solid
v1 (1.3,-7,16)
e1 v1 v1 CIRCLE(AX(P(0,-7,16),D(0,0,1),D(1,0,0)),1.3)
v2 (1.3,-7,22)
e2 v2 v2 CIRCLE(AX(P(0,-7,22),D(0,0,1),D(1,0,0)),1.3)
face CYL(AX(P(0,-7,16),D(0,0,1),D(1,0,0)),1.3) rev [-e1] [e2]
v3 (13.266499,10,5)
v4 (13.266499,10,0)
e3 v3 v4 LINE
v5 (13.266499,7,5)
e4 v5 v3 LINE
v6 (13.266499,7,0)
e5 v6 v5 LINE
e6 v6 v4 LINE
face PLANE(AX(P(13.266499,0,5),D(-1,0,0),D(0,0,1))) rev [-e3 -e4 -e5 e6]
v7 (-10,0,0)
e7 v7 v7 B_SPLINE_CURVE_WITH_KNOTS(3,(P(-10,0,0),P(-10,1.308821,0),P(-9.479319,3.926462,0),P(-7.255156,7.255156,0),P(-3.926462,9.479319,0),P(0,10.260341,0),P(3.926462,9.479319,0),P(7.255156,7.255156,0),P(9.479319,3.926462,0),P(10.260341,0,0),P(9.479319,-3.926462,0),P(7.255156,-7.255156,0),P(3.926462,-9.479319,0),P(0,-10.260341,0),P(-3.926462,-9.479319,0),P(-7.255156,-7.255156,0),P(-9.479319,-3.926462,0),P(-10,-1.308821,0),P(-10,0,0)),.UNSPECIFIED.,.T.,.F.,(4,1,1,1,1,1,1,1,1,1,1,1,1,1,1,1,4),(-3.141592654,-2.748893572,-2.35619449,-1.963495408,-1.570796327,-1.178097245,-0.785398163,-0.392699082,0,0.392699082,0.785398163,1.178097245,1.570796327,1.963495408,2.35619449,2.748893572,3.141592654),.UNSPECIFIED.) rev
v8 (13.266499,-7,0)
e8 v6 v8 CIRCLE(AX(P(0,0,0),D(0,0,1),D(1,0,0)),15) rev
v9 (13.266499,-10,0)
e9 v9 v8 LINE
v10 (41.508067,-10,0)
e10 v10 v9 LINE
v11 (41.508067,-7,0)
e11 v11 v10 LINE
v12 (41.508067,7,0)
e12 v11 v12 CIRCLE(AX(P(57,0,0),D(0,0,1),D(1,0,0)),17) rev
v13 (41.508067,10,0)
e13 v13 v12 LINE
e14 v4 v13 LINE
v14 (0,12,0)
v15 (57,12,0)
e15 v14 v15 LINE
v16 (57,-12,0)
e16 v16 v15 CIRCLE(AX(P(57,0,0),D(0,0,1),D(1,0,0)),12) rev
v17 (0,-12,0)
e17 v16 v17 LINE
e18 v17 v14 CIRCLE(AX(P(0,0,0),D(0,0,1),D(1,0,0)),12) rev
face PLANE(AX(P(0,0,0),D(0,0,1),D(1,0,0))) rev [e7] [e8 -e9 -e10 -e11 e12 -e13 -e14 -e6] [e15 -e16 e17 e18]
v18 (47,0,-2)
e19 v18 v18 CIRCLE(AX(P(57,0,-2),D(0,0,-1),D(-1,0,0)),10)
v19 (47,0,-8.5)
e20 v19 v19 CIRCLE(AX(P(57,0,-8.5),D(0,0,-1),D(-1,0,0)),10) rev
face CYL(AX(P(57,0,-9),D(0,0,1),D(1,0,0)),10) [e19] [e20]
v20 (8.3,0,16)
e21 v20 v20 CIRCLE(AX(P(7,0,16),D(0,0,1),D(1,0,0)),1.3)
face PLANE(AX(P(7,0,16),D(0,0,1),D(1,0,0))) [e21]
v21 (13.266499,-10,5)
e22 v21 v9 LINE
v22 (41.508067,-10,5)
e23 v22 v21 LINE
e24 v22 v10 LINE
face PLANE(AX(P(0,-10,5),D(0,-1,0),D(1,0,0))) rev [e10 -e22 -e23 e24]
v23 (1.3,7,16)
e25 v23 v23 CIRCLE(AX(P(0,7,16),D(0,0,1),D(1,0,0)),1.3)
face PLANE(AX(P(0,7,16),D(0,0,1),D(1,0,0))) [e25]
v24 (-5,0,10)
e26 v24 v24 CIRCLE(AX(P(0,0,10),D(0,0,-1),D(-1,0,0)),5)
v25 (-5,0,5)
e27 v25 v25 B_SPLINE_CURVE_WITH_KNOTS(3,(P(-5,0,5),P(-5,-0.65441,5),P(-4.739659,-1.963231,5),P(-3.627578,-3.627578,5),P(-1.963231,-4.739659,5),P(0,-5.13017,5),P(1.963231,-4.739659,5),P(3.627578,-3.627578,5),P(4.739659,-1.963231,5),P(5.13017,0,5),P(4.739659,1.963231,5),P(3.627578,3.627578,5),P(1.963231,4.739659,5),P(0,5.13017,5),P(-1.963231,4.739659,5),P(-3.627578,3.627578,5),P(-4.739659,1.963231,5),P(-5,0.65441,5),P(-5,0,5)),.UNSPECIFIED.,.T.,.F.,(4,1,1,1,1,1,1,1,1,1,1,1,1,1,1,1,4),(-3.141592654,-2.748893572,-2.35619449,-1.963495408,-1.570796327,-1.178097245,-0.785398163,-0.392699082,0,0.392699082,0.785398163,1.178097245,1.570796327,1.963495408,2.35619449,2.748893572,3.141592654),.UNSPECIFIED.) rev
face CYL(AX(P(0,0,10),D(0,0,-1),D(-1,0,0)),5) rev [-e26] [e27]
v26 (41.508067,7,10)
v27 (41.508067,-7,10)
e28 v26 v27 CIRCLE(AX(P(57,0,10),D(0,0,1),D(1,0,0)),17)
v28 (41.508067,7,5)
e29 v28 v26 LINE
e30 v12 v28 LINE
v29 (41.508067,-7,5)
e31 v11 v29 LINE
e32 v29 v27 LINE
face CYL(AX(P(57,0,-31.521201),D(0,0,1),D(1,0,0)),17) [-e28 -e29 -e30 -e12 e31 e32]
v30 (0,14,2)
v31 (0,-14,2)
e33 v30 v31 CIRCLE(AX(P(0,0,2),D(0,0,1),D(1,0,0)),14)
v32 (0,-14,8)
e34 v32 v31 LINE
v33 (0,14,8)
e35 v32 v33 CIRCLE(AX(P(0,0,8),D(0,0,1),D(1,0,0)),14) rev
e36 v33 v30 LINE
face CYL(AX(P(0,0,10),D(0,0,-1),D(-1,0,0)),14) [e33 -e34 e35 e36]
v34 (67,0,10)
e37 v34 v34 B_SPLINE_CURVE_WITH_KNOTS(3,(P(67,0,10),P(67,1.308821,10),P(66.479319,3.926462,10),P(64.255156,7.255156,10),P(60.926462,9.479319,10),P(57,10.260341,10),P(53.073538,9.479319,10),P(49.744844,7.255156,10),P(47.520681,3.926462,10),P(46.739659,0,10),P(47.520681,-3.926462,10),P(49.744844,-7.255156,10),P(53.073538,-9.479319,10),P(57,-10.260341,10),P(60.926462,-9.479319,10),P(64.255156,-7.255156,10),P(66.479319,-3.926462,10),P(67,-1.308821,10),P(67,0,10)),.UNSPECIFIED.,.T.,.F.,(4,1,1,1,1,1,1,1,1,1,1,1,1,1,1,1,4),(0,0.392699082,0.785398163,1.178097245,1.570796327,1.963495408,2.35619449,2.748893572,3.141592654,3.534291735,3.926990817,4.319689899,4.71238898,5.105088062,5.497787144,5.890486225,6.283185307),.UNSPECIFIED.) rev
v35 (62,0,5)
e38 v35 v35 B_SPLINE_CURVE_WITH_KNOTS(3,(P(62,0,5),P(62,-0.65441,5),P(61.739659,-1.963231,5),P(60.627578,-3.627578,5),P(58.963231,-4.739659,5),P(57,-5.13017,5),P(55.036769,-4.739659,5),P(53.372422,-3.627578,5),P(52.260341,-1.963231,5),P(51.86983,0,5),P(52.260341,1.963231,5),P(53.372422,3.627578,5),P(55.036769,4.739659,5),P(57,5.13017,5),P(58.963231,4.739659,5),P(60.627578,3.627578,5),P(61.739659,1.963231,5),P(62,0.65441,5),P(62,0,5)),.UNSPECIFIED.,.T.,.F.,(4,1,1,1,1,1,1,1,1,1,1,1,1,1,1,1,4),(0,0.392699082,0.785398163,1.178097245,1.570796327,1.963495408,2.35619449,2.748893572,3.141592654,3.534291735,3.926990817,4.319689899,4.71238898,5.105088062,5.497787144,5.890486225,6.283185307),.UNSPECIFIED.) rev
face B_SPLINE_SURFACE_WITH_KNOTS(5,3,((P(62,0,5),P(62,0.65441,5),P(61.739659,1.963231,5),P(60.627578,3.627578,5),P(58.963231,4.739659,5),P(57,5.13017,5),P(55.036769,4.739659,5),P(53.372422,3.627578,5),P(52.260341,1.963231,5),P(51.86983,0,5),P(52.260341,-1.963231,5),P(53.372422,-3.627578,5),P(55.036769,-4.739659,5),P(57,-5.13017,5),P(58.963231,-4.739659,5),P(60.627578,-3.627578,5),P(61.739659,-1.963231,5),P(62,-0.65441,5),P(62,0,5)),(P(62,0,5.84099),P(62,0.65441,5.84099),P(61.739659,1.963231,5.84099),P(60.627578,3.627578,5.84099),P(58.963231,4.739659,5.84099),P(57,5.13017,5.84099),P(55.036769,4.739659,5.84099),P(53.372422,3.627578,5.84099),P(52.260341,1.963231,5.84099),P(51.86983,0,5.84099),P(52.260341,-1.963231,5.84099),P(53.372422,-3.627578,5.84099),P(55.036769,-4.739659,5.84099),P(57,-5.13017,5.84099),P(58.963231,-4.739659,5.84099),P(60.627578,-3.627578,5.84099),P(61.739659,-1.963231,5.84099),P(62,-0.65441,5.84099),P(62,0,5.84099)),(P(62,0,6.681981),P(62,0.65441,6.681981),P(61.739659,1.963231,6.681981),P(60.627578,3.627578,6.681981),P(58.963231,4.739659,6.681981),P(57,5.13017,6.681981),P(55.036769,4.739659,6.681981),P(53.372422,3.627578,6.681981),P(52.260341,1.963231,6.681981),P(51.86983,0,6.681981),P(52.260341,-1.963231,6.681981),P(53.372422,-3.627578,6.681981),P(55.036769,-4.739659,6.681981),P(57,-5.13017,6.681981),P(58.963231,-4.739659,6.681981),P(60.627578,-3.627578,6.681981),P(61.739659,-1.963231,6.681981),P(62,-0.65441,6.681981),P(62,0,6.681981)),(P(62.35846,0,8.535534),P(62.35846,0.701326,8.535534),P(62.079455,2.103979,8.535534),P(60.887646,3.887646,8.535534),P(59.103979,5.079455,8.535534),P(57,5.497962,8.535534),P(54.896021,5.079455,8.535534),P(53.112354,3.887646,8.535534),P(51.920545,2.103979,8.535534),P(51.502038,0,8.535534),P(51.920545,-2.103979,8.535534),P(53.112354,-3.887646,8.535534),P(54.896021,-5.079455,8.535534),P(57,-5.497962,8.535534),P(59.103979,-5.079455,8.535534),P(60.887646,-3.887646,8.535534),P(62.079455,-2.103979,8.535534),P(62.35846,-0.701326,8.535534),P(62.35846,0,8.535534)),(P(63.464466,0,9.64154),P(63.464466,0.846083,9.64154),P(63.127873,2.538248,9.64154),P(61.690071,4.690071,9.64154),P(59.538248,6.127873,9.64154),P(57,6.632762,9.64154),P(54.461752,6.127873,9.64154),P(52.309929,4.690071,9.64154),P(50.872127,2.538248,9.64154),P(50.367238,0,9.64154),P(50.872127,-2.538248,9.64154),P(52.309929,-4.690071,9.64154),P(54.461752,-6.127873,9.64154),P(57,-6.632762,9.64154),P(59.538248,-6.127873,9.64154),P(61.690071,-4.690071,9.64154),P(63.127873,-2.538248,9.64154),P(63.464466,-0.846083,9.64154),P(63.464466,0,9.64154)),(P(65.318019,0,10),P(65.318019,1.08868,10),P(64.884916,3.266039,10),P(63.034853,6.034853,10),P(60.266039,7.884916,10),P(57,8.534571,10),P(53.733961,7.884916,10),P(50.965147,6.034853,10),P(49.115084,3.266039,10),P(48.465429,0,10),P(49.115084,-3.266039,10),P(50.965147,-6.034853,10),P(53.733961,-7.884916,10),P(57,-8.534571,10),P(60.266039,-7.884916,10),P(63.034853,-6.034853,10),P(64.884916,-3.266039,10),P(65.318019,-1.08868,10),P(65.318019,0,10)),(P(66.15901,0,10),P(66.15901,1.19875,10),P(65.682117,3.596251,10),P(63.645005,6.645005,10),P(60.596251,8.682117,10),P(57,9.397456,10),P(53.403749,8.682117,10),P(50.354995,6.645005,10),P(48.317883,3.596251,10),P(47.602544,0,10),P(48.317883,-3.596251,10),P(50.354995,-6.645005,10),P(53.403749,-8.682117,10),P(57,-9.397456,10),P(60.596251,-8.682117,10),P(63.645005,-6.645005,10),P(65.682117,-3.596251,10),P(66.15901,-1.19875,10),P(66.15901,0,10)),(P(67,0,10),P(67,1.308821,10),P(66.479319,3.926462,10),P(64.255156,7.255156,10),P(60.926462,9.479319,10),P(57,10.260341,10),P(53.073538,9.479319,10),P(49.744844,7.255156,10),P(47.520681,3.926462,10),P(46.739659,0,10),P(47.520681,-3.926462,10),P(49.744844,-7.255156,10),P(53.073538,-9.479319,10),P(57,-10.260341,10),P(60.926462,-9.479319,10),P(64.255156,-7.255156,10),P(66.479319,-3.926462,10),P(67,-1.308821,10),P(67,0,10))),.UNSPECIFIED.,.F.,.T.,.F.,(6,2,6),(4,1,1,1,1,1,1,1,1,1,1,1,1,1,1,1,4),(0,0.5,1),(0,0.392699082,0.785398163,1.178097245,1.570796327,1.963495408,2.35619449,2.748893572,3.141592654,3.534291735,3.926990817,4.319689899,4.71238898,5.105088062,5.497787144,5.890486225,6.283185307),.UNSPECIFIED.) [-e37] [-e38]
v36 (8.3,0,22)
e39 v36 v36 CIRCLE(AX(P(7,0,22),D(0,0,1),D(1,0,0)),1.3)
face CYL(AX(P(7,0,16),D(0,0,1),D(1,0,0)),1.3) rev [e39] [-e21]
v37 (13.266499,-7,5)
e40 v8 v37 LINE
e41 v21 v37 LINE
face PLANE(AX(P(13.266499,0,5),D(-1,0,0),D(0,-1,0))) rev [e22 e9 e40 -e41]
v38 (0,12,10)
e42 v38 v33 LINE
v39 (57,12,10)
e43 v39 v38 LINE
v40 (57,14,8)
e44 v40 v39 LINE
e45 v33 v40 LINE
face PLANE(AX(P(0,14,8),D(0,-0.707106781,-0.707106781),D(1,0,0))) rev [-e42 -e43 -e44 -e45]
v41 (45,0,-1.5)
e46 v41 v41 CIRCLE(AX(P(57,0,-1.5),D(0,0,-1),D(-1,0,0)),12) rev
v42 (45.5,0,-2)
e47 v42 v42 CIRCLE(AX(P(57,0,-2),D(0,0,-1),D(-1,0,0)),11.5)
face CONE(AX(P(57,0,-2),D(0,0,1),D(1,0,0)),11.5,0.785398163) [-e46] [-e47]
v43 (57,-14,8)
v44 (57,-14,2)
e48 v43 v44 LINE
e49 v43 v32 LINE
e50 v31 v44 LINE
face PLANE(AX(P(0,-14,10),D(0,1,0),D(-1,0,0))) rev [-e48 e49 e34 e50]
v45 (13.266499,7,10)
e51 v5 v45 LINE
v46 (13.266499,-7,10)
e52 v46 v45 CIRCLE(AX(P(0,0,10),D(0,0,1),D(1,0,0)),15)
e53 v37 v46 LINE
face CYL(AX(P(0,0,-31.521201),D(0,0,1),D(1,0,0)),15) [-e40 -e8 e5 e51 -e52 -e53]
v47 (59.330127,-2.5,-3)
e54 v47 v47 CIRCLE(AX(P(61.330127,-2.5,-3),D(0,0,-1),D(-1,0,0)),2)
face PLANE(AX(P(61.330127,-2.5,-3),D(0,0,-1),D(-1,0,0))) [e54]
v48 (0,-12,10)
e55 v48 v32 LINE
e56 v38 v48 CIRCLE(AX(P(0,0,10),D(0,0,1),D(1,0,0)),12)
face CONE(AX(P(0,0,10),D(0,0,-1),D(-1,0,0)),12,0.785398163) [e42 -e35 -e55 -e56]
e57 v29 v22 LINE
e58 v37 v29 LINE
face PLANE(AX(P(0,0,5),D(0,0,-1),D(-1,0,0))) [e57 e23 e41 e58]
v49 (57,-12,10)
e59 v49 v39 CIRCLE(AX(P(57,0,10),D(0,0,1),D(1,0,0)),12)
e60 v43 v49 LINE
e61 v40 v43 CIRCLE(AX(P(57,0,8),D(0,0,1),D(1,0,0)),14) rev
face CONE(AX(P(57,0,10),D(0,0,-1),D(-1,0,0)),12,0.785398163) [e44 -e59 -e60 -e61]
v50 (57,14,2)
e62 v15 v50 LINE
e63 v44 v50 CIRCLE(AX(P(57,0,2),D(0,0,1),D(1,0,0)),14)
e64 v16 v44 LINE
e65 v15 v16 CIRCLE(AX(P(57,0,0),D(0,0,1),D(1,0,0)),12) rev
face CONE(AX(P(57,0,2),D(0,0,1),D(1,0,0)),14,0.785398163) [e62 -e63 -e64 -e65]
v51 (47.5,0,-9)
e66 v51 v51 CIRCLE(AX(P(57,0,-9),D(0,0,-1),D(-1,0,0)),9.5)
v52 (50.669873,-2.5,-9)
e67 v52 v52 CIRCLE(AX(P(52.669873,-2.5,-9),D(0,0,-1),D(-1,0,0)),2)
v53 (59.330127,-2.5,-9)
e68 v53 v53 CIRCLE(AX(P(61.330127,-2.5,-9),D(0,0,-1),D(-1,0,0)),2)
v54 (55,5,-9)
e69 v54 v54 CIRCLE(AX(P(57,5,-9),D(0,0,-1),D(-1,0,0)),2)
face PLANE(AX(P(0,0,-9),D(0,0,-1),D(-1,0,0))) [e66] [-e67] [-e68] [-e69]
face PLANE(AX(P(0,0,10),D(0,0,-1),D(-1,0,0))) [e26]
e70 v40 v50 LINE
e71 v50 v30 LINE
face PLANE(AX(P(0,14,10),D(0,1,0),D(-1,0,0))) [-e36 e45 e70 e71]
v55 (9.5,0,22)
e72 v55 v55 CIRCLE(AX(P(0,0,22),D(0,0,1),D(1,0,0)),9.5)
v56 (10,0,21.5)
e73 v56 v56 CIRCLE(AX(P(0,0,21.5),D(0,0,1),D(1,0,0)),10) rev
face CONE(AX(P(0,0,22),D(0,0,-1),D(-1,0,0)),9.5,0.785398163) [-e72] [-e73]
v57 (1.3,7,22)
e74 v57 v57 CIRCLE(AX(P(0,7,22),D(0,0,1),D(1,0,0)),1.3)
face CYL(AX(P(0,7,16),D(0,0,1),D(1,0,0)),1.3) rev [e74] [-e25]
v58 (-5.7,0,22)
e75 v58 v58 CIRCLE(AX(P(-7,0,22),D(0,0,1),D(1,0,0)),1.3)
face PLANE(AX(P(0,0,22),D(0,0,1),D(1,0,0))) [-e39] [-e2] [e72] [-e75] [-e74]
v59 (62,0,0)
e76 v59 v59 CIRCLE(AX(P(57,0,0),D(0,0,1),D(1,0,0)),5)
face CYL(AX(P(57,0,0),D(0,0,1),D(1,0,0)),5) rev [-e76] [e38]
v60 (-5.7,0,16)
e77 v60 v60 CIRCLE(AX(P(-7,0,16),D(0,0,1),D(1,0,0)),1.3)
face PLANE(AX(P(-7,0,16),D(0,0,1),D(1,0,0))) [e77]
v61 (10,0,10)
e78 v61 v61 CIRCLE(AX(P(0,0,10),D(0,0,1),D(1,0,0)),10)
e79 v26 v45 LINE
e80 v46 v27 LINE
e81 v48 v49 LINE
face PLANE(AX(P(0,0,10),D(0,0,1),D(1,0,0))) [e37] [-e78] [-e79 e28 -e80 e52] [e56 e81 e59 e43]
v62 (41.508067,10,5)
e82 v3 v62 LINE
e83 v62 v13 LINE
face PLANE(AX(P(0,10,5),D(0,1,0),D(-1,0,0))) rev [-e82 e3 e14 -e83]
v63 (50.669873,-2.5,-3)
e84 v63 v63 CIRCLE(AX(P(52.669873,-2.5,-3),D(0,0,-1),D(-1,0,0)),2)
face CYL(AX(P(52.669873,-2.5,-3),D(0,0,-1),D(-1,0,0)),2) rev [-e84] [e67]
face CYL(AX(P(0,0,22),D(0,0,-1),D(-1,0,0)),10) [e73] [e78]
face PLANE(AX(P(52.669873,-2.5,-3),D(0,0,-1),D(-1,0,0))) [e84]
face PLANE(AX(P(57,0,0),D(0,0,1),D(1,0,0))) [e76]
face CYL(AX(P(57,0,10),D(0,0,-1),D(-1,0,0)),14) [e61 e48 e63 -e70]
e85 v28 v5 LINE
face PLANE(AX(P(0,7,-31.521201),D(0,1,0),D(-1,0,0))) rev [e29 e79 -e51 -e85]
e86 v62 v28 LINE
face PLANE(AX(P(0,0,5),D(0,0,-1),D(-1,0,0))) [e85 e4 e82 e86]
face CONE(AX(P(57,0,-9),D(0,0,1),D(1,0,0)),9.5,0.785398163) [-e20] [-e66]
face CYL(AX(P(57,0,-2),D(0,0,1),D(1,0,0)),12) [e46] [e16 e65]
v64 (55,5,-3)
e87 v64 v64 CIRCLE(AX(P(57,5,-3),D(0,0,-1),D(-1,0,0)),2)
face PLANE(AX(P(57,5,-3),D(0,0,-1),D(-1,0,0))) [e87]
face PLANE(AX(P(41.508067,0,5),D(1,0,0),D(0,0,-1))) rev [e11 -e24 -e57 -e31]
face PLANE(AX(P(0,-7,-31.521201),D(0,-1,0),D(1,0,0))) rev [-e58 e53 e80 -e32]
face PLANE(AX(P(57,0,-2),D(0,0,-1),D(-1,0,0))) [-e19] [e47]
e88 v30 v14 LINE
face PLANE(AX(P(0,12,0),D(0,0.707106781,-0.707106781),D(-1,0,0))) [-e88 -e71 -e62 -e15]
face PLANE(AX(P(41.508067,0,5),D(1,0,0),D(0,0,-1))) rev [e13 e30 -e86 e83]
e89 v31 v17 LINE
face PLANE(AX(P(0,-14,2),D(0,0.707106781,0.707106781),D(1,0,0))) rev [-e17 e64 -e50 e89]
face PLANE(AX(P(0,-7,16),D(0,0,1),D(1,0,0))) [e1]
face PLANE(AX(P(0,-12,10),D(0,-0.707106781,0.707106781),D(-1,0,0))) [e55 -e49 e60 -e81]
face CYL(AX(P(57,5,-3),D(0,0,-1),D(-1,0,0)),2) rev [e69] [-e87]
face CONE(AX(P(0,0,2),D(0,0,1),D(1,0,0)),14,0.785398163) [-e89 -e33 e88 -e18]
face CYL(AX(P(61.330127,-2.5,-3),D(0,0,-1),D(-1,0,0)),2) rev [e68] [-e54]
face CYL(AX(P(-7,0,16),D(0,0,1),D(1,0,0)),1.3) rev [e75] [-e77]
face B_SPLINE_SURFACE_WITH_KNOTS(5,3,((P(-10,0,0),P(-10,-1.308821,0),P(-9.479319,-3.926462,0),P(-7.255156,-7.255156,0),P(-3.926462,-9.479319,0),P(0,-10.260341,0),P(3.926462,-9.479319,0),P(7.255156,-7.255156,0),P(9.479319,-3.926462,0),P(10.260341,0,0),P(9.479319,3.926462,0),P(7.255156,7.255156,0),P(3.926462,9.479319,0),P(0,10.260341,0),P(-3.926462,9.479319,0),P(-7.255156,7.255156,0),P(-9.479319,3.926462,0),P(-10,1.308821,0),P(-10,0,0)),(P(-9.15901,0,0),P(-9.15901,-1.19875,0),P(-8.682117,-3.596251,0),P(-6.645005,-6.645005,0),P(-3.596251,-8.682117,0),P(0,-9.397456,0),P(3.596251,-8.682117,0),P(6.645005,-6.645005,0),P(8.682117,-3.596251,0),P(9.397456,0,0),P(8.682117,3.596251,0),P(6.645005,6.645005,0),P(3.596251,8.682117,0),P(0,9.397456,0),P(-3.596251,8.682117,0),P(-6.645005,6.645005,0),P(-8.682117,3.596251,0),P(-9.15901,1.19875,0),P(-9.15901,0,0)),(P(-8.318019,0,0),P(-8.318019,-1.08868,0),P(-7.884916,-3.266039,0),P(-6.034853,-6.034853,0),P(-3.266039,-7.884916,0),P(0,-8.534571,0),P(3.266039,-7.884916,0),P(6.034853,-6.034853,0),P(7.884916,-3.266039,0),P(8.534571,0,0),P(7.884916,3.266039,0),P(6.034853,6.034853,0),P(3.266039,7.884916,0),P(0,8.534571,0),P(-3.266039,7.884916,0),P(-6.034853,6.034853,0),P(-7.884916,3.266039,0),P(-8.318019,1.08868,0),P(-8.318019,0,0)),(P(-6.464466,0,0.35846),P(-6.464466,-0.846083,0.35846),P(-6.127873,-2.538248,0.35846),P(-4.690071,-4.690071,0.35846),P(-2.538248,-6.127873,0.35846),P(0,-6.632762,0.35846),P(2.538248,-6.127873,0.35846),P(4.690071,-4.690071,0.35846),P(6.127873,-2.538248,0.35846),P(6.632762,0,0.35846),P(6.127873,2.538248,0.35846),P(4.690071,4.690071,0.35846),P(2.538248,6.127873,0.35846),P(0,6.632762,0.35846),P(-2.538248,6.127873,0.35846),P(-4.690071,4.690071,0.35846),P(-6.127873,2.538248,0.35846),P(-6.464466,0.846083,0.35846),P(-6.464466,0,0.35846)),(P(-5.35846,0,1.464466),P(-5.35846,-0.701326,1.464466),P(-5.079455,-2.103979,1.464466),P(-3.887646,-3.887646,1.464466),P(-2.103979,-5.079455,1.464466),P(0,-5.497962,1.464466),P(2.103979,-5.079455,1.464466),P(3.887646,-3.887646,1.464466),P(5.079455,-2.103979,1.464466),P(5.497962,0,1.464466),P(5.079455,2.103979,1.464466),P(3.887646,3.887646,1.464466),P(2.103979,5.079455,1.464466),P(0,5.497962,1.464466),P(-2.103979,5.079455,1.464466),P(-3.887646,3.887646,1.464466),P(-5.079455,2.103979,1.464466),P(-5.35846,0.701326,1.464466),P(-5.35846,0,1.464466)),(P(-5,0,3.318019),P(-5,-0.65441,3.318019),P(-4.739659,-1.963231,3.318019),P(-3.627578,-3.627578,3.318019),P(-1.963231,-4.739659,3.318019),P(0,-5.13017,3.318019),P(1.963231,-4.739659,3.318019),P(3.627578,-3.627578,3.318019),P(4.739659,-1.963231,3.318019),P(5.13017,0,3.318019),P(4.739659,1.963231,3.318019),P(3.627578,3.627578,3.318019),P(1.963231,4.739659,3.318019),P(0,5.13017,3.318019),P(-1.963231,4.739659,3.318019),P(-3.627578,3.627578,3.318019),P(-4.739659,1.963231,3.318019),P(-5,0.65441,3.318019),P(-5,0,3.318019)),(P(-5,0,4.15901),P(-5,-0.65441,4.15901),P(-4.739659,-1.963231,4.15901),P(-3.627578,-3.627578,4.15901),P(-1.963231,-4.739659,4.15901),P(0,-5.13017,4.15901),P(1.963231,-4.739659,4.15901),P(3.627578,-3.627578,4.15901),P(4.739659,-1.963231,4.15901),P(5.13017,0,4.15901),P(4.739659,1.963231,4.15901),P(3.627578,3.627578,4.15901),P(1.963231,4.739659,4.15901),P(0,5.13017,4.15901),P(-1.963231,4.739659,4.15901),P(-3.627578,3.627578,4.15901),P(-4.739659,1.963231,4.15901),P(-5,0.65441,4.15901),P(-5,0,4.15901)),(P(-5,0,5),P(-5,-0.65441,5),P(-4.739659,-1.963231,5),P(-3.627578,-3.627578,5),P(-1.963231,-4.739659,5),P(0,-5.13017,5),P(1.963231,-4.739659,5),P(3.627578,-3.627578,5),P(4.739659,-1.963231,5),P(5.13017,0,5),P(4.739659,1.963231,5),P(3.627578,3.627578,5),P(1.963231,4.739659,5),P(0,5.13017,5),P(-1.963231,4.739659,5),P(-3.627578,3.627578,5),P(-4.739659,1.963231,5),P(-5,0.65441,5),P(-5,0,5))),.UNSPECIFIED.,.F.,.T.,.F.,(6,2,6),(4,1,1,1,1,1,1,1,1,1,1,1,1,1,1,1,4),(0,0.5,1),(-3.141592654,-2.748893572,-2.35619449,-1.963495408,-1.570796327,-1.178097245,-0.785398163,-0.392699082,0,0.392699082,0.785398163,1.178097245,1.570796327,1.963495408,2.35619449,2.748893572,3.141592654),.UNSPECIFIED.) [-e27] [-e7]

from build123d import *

# Parameters (mm, degrees)
EXTRUDE_1_DEPTH     = 10
SKETCH_2_R          = 10
EXTRUDE_2_DEPTH     = 12
SKETCH_3_R          = 10
EXTRUDE_3_DEPTH     = 9
SKETCH_4_R          = 12
SKETCH_4_R_2        = 10
EXTRUDE_4_DEPTH     = 2
CHAMFER_1_SIZE      = 0.5
CHAMFER_2_SIZE      = 2
SKETCH_5_R          = 2
CUT_EXTRUDE_1_DEPTH = 6
SKETCH_6_R          = 1.3
CUT_EXTRUDE_2_DEPTH = 6
CUT_EXTRUDE_3_REACH = 76.82
SKETCH_8_W          = 28.241567454
SKETCH_8_H          = 3
CUT_EXTRUDE_4_DEPTH = 5
SKETCH_9_R          = 5
CUT_EXTRUDE_5_DEPTH = 10
SKETCH_10_R         = 5
CUT_EXTRUDE_6_DEPTH = 10
FILLET_1_SIZE       = 5


# Some blends are built 0.0001 mm under size
with BuildPart() as part:
    # 草图1 → 凸台-拉伸1 (new body)
    with BuildSketch(Plane.XY):
        with BuildLine():
            Line((57, 14), (0, 14))
            ThreePointArc((0, 14), (-14, 0), (0, -14))
            Line((0, -14), (57, -14))
            ThreePointArc((57, -14), (71, 0), (57, 14))
        make_face()
    extrude(amount=EXTRUDE_1_DEPTH)

    # 草图2 → 凸台-拉伸2 (add)
    with BuildSketch(Plane.XY.offset(10)):
        Circle(SKETCH_2_R)
    extrude(amount=EXTRUDE_2_DEPTH)

    # 草图3 → 凸台-拉伸3 (add)
    with BuildSketch(Plane(origin=(0, 0, 0), x_dir=(-1, 0, 0), z_dir=(0, 0, -1))):
        with Locations((-57, 0)):
            Circle(SKETCH_3_R)
    extrude(amount=EXTRUDE_3_DEPTH)

    # 草图4 → 凸台-拉伸4 (add)
    with BuildSketch(Plane(origin=(0, 0, 0), x_dir=(-1, 0, 0), z_dir=(0, 0, -1))):
        with Locations(Location((-57, 0, 0), (0, 0, 180))):
            Circle(SKETCH_4_R)
        with Locations((-57, 0)):
            Circle(SKETCH_4_R_2, mode=Mode.SUBTRACT)
    extrude(amount=EXTRUDE_4_DEPTH)

    # 倒角1
    chamfer_1_edges = [part.edges().sort_by_distance(p)[0] for p in [
        (-10, 0, 22),
        (67, 0, -9),
        (45, 0, -2),
    ]]
    chamfer(chamfer_1_edges, length=CHAMFER_1_SIZE)

    # 倒角2
    chamfer_2_edges = [part.edges().sort_by_distance(p)[0] for p in [
        (71, 0, 10),
        (28.5, 14, 10),
        (-14, 0, 10),
        (28.5, -14, 10),
        (-14, 0, 0),
        (28.5, 14, 0),
        (71, 0, 0),
        (28.5, -14, 0),
    ]]
    chamfer(chamfer_2_edges, length=CHAMFER_2_SIZE - 0.0001)  # a hair under: the kernel refuses the full size

    # 草图5 → 切除-拉伸1 (cut)
    with BuildSketch(Plane(origin=(0, 0, -9), x_dir=(-1, 0, 0), z_dir=(0, 0, -1))):
        with Locations((-57, 5)):
            Circle(SKETCH_5_R)
        with Locations((-52.669872981, -2.5)):
            Circle(SKETCH_5_R)
        with Locations((-61.330127019, -2.5)):
            Circle(SKETCH_5_R)
    extrude(amount=-CUT_EXTRUDE_1_DEPTH, mode=Mode.SUBTRACT)

    # 草图6 → 切除-拉伸2 (cut)
    with BuildSketch(Plane.XY.offset(22)):
        with Locations((0, 7)):
            Circle(SKETCH_6_R)
        with Locations((7, 0)):
            Circle(SKETCH_6_R)
        with Locations((0, -7)):
            Circle(SKETCH_6_R)
        with Locations((-7, 0)):
            Circle(SKETCH_6_R)
    extrude(amount=-CUT_EXTRUDE_2_DEPTH, mode=Mode.SUBTRACT)

    # 草图7 → 切除-拉伸3 (cut, up to next)
    with BuildSketch(Plane.XY.offset(10), mode=Mode.PRIVATE) as cut_extrude_3_sk1:
        with BuildLine():
            ThreePointArc((41.508066615, -7), (40, 0), (41.508066615, 7))
            Line((41.508066615, 7), (13.266499161, 7))
            ThreePointArc((13.266499161, 7), (14.560176637, 3.605725487), (15, 0))
            ThreePointArc((15, 0), (14.560176637, -3.605725487), (13.266499161, -7))
            Line((13.266499161, -7), (41.508066615, -7))
        make_face()
    cut_extrude_3_tool1 = extrude(cut_extrude_3_sk1.sketch, amount=-CUT_EXTRUDE_3_REACH, mode=Mode.PRIVATE) & part.part
    add(cut_extrude_3_tool1.solids().sort_by_distance((27.463612, 0, 10))[0], mode=Mode.SUBTRACT)

    # 草图8 → 切除-拉伸4 (cut)
    with BuildSketch(Plane(origin=(0, 0, 0), x_dir=(-1, 0, 0), z_dir=(0, 0, -1))):
        with Locations((-27.387282888, 8.5)):
            Rectangle(SKETCH_8_W, SKETCH_8_H)
        with Locations((-27.387282888, -8.5)):
            Rectangle(SKETCH_8_W, SKETCH_8_H)
    extrude(amount=-CUT_EXTRUDE_4_DEPTH, mode=Mode.SUBTRACT)

    # 草图9 → 切除-拉伸5 (cut)
    with BuildSketch(Plane.XY.offset(10)):
        with Locations((57, 0)):
            Circle(SKETCH_9_R)
    extrude(amount=-CUT_EXTRUDE_5_DEPTH, mode=Mode.SUBTRACT)

    # 草图10 → 切除-拉伸6 (cut)
    with BuildSketch(Plane(origin=(0, 0, 0), x_dir=(-1, 0, 0), z_dir=(0, 0, -1))):
        Circle(SKETCH_10_R)
    extrude(amount=-CUT_EXTRUDE_6_DEPTH, mode=Mode.SUBTRACT)

    # 圆角1
    # a fillet whose section is not a circle: 5 mm, written as the material it takes off along each edge
    with BuildSketch(Plane(origin=(57, 0, 10), x_dir=(1, 0, 0), z_dir=(0, -1, 0))) as fillet_1_piece_1:
        with BuildLine():
            add(Edge.make_bspline([(5 + FILLET_1_SIZE, 0), (5 + FILLET_1_SIZE * 0.831801948466, 0), (5 + FILLET_1_SIZE * 0.663603896932, 0), (5 + FILLET_1_SIZE * 0.292893218813, -FILLET_1_SIZE * 0.0716919198361), (5 + FILLET_1_SIZE * 0.0716919198361, -FILLET_1_SIZE * 0.292893218813), (5, -FILLET_1_SIZE * 0.663603896932), (5, -FILLET_1_SIZE * 0.831801948466), (5, -FILLET_1_SIZE)], knots=[0, 0, 0, 0, 0, 0, 0.5, 0.5, 1, 1, 1, 1, 1, 1], degree=5))
            Line((5, -FILLET_1_SIZE), (5, 0))
            Line((5, 0), (5 + FILLET_1_SIZE, 0))
        make_face()
    revolve(axis=Axis((57, 0, 10), (0, 0, 1)), mode=Mode.SUBTRACT)
    with BuildSketch(Plane(origin=(0, 0, 0), x_dir=(-1, 0, 0), z_dir=(0, -1, 0))) as fillet_1_piece_2:
        with BuildLine():
            add(Edge.make_bspline([(5 + FILLET_1_SIZE, 0), (5 + FILLET_1_SIZE * 0.831801948466, 0), (5 + FILLET_1_SIZE * 0.663603896932, 0), (5 + FILLET_1_SIZE * 0.292893218813, -FILLET_1_SIZE * 0.0716919198361), (5 + FILLET_1_SIZE * 0.0716919198361, -FILLET_1_SIZE * 0.292893218813), (5, -FILLET_1_SIZE * 0.663603896932), (5, -FILLET_1_SIZE * 0.831801948466), (5, -FILLET_1_SIZE)], knots=[0, 0, 0, 0, 0, 0, 0.5, 0.5, 1, 1, 1, 1, 1, 1], degree=5))
            Line((5, -FILLET_1_SIZE), (5, 0))
            Line((5, 0), (5 + FILLET_1_SIZE, 0))
        make_face()
    revolve(axis=Axis((0, 0, 0), (0, 0, -1)), mode=Mode.SUBTRACT)


solid = part.part
